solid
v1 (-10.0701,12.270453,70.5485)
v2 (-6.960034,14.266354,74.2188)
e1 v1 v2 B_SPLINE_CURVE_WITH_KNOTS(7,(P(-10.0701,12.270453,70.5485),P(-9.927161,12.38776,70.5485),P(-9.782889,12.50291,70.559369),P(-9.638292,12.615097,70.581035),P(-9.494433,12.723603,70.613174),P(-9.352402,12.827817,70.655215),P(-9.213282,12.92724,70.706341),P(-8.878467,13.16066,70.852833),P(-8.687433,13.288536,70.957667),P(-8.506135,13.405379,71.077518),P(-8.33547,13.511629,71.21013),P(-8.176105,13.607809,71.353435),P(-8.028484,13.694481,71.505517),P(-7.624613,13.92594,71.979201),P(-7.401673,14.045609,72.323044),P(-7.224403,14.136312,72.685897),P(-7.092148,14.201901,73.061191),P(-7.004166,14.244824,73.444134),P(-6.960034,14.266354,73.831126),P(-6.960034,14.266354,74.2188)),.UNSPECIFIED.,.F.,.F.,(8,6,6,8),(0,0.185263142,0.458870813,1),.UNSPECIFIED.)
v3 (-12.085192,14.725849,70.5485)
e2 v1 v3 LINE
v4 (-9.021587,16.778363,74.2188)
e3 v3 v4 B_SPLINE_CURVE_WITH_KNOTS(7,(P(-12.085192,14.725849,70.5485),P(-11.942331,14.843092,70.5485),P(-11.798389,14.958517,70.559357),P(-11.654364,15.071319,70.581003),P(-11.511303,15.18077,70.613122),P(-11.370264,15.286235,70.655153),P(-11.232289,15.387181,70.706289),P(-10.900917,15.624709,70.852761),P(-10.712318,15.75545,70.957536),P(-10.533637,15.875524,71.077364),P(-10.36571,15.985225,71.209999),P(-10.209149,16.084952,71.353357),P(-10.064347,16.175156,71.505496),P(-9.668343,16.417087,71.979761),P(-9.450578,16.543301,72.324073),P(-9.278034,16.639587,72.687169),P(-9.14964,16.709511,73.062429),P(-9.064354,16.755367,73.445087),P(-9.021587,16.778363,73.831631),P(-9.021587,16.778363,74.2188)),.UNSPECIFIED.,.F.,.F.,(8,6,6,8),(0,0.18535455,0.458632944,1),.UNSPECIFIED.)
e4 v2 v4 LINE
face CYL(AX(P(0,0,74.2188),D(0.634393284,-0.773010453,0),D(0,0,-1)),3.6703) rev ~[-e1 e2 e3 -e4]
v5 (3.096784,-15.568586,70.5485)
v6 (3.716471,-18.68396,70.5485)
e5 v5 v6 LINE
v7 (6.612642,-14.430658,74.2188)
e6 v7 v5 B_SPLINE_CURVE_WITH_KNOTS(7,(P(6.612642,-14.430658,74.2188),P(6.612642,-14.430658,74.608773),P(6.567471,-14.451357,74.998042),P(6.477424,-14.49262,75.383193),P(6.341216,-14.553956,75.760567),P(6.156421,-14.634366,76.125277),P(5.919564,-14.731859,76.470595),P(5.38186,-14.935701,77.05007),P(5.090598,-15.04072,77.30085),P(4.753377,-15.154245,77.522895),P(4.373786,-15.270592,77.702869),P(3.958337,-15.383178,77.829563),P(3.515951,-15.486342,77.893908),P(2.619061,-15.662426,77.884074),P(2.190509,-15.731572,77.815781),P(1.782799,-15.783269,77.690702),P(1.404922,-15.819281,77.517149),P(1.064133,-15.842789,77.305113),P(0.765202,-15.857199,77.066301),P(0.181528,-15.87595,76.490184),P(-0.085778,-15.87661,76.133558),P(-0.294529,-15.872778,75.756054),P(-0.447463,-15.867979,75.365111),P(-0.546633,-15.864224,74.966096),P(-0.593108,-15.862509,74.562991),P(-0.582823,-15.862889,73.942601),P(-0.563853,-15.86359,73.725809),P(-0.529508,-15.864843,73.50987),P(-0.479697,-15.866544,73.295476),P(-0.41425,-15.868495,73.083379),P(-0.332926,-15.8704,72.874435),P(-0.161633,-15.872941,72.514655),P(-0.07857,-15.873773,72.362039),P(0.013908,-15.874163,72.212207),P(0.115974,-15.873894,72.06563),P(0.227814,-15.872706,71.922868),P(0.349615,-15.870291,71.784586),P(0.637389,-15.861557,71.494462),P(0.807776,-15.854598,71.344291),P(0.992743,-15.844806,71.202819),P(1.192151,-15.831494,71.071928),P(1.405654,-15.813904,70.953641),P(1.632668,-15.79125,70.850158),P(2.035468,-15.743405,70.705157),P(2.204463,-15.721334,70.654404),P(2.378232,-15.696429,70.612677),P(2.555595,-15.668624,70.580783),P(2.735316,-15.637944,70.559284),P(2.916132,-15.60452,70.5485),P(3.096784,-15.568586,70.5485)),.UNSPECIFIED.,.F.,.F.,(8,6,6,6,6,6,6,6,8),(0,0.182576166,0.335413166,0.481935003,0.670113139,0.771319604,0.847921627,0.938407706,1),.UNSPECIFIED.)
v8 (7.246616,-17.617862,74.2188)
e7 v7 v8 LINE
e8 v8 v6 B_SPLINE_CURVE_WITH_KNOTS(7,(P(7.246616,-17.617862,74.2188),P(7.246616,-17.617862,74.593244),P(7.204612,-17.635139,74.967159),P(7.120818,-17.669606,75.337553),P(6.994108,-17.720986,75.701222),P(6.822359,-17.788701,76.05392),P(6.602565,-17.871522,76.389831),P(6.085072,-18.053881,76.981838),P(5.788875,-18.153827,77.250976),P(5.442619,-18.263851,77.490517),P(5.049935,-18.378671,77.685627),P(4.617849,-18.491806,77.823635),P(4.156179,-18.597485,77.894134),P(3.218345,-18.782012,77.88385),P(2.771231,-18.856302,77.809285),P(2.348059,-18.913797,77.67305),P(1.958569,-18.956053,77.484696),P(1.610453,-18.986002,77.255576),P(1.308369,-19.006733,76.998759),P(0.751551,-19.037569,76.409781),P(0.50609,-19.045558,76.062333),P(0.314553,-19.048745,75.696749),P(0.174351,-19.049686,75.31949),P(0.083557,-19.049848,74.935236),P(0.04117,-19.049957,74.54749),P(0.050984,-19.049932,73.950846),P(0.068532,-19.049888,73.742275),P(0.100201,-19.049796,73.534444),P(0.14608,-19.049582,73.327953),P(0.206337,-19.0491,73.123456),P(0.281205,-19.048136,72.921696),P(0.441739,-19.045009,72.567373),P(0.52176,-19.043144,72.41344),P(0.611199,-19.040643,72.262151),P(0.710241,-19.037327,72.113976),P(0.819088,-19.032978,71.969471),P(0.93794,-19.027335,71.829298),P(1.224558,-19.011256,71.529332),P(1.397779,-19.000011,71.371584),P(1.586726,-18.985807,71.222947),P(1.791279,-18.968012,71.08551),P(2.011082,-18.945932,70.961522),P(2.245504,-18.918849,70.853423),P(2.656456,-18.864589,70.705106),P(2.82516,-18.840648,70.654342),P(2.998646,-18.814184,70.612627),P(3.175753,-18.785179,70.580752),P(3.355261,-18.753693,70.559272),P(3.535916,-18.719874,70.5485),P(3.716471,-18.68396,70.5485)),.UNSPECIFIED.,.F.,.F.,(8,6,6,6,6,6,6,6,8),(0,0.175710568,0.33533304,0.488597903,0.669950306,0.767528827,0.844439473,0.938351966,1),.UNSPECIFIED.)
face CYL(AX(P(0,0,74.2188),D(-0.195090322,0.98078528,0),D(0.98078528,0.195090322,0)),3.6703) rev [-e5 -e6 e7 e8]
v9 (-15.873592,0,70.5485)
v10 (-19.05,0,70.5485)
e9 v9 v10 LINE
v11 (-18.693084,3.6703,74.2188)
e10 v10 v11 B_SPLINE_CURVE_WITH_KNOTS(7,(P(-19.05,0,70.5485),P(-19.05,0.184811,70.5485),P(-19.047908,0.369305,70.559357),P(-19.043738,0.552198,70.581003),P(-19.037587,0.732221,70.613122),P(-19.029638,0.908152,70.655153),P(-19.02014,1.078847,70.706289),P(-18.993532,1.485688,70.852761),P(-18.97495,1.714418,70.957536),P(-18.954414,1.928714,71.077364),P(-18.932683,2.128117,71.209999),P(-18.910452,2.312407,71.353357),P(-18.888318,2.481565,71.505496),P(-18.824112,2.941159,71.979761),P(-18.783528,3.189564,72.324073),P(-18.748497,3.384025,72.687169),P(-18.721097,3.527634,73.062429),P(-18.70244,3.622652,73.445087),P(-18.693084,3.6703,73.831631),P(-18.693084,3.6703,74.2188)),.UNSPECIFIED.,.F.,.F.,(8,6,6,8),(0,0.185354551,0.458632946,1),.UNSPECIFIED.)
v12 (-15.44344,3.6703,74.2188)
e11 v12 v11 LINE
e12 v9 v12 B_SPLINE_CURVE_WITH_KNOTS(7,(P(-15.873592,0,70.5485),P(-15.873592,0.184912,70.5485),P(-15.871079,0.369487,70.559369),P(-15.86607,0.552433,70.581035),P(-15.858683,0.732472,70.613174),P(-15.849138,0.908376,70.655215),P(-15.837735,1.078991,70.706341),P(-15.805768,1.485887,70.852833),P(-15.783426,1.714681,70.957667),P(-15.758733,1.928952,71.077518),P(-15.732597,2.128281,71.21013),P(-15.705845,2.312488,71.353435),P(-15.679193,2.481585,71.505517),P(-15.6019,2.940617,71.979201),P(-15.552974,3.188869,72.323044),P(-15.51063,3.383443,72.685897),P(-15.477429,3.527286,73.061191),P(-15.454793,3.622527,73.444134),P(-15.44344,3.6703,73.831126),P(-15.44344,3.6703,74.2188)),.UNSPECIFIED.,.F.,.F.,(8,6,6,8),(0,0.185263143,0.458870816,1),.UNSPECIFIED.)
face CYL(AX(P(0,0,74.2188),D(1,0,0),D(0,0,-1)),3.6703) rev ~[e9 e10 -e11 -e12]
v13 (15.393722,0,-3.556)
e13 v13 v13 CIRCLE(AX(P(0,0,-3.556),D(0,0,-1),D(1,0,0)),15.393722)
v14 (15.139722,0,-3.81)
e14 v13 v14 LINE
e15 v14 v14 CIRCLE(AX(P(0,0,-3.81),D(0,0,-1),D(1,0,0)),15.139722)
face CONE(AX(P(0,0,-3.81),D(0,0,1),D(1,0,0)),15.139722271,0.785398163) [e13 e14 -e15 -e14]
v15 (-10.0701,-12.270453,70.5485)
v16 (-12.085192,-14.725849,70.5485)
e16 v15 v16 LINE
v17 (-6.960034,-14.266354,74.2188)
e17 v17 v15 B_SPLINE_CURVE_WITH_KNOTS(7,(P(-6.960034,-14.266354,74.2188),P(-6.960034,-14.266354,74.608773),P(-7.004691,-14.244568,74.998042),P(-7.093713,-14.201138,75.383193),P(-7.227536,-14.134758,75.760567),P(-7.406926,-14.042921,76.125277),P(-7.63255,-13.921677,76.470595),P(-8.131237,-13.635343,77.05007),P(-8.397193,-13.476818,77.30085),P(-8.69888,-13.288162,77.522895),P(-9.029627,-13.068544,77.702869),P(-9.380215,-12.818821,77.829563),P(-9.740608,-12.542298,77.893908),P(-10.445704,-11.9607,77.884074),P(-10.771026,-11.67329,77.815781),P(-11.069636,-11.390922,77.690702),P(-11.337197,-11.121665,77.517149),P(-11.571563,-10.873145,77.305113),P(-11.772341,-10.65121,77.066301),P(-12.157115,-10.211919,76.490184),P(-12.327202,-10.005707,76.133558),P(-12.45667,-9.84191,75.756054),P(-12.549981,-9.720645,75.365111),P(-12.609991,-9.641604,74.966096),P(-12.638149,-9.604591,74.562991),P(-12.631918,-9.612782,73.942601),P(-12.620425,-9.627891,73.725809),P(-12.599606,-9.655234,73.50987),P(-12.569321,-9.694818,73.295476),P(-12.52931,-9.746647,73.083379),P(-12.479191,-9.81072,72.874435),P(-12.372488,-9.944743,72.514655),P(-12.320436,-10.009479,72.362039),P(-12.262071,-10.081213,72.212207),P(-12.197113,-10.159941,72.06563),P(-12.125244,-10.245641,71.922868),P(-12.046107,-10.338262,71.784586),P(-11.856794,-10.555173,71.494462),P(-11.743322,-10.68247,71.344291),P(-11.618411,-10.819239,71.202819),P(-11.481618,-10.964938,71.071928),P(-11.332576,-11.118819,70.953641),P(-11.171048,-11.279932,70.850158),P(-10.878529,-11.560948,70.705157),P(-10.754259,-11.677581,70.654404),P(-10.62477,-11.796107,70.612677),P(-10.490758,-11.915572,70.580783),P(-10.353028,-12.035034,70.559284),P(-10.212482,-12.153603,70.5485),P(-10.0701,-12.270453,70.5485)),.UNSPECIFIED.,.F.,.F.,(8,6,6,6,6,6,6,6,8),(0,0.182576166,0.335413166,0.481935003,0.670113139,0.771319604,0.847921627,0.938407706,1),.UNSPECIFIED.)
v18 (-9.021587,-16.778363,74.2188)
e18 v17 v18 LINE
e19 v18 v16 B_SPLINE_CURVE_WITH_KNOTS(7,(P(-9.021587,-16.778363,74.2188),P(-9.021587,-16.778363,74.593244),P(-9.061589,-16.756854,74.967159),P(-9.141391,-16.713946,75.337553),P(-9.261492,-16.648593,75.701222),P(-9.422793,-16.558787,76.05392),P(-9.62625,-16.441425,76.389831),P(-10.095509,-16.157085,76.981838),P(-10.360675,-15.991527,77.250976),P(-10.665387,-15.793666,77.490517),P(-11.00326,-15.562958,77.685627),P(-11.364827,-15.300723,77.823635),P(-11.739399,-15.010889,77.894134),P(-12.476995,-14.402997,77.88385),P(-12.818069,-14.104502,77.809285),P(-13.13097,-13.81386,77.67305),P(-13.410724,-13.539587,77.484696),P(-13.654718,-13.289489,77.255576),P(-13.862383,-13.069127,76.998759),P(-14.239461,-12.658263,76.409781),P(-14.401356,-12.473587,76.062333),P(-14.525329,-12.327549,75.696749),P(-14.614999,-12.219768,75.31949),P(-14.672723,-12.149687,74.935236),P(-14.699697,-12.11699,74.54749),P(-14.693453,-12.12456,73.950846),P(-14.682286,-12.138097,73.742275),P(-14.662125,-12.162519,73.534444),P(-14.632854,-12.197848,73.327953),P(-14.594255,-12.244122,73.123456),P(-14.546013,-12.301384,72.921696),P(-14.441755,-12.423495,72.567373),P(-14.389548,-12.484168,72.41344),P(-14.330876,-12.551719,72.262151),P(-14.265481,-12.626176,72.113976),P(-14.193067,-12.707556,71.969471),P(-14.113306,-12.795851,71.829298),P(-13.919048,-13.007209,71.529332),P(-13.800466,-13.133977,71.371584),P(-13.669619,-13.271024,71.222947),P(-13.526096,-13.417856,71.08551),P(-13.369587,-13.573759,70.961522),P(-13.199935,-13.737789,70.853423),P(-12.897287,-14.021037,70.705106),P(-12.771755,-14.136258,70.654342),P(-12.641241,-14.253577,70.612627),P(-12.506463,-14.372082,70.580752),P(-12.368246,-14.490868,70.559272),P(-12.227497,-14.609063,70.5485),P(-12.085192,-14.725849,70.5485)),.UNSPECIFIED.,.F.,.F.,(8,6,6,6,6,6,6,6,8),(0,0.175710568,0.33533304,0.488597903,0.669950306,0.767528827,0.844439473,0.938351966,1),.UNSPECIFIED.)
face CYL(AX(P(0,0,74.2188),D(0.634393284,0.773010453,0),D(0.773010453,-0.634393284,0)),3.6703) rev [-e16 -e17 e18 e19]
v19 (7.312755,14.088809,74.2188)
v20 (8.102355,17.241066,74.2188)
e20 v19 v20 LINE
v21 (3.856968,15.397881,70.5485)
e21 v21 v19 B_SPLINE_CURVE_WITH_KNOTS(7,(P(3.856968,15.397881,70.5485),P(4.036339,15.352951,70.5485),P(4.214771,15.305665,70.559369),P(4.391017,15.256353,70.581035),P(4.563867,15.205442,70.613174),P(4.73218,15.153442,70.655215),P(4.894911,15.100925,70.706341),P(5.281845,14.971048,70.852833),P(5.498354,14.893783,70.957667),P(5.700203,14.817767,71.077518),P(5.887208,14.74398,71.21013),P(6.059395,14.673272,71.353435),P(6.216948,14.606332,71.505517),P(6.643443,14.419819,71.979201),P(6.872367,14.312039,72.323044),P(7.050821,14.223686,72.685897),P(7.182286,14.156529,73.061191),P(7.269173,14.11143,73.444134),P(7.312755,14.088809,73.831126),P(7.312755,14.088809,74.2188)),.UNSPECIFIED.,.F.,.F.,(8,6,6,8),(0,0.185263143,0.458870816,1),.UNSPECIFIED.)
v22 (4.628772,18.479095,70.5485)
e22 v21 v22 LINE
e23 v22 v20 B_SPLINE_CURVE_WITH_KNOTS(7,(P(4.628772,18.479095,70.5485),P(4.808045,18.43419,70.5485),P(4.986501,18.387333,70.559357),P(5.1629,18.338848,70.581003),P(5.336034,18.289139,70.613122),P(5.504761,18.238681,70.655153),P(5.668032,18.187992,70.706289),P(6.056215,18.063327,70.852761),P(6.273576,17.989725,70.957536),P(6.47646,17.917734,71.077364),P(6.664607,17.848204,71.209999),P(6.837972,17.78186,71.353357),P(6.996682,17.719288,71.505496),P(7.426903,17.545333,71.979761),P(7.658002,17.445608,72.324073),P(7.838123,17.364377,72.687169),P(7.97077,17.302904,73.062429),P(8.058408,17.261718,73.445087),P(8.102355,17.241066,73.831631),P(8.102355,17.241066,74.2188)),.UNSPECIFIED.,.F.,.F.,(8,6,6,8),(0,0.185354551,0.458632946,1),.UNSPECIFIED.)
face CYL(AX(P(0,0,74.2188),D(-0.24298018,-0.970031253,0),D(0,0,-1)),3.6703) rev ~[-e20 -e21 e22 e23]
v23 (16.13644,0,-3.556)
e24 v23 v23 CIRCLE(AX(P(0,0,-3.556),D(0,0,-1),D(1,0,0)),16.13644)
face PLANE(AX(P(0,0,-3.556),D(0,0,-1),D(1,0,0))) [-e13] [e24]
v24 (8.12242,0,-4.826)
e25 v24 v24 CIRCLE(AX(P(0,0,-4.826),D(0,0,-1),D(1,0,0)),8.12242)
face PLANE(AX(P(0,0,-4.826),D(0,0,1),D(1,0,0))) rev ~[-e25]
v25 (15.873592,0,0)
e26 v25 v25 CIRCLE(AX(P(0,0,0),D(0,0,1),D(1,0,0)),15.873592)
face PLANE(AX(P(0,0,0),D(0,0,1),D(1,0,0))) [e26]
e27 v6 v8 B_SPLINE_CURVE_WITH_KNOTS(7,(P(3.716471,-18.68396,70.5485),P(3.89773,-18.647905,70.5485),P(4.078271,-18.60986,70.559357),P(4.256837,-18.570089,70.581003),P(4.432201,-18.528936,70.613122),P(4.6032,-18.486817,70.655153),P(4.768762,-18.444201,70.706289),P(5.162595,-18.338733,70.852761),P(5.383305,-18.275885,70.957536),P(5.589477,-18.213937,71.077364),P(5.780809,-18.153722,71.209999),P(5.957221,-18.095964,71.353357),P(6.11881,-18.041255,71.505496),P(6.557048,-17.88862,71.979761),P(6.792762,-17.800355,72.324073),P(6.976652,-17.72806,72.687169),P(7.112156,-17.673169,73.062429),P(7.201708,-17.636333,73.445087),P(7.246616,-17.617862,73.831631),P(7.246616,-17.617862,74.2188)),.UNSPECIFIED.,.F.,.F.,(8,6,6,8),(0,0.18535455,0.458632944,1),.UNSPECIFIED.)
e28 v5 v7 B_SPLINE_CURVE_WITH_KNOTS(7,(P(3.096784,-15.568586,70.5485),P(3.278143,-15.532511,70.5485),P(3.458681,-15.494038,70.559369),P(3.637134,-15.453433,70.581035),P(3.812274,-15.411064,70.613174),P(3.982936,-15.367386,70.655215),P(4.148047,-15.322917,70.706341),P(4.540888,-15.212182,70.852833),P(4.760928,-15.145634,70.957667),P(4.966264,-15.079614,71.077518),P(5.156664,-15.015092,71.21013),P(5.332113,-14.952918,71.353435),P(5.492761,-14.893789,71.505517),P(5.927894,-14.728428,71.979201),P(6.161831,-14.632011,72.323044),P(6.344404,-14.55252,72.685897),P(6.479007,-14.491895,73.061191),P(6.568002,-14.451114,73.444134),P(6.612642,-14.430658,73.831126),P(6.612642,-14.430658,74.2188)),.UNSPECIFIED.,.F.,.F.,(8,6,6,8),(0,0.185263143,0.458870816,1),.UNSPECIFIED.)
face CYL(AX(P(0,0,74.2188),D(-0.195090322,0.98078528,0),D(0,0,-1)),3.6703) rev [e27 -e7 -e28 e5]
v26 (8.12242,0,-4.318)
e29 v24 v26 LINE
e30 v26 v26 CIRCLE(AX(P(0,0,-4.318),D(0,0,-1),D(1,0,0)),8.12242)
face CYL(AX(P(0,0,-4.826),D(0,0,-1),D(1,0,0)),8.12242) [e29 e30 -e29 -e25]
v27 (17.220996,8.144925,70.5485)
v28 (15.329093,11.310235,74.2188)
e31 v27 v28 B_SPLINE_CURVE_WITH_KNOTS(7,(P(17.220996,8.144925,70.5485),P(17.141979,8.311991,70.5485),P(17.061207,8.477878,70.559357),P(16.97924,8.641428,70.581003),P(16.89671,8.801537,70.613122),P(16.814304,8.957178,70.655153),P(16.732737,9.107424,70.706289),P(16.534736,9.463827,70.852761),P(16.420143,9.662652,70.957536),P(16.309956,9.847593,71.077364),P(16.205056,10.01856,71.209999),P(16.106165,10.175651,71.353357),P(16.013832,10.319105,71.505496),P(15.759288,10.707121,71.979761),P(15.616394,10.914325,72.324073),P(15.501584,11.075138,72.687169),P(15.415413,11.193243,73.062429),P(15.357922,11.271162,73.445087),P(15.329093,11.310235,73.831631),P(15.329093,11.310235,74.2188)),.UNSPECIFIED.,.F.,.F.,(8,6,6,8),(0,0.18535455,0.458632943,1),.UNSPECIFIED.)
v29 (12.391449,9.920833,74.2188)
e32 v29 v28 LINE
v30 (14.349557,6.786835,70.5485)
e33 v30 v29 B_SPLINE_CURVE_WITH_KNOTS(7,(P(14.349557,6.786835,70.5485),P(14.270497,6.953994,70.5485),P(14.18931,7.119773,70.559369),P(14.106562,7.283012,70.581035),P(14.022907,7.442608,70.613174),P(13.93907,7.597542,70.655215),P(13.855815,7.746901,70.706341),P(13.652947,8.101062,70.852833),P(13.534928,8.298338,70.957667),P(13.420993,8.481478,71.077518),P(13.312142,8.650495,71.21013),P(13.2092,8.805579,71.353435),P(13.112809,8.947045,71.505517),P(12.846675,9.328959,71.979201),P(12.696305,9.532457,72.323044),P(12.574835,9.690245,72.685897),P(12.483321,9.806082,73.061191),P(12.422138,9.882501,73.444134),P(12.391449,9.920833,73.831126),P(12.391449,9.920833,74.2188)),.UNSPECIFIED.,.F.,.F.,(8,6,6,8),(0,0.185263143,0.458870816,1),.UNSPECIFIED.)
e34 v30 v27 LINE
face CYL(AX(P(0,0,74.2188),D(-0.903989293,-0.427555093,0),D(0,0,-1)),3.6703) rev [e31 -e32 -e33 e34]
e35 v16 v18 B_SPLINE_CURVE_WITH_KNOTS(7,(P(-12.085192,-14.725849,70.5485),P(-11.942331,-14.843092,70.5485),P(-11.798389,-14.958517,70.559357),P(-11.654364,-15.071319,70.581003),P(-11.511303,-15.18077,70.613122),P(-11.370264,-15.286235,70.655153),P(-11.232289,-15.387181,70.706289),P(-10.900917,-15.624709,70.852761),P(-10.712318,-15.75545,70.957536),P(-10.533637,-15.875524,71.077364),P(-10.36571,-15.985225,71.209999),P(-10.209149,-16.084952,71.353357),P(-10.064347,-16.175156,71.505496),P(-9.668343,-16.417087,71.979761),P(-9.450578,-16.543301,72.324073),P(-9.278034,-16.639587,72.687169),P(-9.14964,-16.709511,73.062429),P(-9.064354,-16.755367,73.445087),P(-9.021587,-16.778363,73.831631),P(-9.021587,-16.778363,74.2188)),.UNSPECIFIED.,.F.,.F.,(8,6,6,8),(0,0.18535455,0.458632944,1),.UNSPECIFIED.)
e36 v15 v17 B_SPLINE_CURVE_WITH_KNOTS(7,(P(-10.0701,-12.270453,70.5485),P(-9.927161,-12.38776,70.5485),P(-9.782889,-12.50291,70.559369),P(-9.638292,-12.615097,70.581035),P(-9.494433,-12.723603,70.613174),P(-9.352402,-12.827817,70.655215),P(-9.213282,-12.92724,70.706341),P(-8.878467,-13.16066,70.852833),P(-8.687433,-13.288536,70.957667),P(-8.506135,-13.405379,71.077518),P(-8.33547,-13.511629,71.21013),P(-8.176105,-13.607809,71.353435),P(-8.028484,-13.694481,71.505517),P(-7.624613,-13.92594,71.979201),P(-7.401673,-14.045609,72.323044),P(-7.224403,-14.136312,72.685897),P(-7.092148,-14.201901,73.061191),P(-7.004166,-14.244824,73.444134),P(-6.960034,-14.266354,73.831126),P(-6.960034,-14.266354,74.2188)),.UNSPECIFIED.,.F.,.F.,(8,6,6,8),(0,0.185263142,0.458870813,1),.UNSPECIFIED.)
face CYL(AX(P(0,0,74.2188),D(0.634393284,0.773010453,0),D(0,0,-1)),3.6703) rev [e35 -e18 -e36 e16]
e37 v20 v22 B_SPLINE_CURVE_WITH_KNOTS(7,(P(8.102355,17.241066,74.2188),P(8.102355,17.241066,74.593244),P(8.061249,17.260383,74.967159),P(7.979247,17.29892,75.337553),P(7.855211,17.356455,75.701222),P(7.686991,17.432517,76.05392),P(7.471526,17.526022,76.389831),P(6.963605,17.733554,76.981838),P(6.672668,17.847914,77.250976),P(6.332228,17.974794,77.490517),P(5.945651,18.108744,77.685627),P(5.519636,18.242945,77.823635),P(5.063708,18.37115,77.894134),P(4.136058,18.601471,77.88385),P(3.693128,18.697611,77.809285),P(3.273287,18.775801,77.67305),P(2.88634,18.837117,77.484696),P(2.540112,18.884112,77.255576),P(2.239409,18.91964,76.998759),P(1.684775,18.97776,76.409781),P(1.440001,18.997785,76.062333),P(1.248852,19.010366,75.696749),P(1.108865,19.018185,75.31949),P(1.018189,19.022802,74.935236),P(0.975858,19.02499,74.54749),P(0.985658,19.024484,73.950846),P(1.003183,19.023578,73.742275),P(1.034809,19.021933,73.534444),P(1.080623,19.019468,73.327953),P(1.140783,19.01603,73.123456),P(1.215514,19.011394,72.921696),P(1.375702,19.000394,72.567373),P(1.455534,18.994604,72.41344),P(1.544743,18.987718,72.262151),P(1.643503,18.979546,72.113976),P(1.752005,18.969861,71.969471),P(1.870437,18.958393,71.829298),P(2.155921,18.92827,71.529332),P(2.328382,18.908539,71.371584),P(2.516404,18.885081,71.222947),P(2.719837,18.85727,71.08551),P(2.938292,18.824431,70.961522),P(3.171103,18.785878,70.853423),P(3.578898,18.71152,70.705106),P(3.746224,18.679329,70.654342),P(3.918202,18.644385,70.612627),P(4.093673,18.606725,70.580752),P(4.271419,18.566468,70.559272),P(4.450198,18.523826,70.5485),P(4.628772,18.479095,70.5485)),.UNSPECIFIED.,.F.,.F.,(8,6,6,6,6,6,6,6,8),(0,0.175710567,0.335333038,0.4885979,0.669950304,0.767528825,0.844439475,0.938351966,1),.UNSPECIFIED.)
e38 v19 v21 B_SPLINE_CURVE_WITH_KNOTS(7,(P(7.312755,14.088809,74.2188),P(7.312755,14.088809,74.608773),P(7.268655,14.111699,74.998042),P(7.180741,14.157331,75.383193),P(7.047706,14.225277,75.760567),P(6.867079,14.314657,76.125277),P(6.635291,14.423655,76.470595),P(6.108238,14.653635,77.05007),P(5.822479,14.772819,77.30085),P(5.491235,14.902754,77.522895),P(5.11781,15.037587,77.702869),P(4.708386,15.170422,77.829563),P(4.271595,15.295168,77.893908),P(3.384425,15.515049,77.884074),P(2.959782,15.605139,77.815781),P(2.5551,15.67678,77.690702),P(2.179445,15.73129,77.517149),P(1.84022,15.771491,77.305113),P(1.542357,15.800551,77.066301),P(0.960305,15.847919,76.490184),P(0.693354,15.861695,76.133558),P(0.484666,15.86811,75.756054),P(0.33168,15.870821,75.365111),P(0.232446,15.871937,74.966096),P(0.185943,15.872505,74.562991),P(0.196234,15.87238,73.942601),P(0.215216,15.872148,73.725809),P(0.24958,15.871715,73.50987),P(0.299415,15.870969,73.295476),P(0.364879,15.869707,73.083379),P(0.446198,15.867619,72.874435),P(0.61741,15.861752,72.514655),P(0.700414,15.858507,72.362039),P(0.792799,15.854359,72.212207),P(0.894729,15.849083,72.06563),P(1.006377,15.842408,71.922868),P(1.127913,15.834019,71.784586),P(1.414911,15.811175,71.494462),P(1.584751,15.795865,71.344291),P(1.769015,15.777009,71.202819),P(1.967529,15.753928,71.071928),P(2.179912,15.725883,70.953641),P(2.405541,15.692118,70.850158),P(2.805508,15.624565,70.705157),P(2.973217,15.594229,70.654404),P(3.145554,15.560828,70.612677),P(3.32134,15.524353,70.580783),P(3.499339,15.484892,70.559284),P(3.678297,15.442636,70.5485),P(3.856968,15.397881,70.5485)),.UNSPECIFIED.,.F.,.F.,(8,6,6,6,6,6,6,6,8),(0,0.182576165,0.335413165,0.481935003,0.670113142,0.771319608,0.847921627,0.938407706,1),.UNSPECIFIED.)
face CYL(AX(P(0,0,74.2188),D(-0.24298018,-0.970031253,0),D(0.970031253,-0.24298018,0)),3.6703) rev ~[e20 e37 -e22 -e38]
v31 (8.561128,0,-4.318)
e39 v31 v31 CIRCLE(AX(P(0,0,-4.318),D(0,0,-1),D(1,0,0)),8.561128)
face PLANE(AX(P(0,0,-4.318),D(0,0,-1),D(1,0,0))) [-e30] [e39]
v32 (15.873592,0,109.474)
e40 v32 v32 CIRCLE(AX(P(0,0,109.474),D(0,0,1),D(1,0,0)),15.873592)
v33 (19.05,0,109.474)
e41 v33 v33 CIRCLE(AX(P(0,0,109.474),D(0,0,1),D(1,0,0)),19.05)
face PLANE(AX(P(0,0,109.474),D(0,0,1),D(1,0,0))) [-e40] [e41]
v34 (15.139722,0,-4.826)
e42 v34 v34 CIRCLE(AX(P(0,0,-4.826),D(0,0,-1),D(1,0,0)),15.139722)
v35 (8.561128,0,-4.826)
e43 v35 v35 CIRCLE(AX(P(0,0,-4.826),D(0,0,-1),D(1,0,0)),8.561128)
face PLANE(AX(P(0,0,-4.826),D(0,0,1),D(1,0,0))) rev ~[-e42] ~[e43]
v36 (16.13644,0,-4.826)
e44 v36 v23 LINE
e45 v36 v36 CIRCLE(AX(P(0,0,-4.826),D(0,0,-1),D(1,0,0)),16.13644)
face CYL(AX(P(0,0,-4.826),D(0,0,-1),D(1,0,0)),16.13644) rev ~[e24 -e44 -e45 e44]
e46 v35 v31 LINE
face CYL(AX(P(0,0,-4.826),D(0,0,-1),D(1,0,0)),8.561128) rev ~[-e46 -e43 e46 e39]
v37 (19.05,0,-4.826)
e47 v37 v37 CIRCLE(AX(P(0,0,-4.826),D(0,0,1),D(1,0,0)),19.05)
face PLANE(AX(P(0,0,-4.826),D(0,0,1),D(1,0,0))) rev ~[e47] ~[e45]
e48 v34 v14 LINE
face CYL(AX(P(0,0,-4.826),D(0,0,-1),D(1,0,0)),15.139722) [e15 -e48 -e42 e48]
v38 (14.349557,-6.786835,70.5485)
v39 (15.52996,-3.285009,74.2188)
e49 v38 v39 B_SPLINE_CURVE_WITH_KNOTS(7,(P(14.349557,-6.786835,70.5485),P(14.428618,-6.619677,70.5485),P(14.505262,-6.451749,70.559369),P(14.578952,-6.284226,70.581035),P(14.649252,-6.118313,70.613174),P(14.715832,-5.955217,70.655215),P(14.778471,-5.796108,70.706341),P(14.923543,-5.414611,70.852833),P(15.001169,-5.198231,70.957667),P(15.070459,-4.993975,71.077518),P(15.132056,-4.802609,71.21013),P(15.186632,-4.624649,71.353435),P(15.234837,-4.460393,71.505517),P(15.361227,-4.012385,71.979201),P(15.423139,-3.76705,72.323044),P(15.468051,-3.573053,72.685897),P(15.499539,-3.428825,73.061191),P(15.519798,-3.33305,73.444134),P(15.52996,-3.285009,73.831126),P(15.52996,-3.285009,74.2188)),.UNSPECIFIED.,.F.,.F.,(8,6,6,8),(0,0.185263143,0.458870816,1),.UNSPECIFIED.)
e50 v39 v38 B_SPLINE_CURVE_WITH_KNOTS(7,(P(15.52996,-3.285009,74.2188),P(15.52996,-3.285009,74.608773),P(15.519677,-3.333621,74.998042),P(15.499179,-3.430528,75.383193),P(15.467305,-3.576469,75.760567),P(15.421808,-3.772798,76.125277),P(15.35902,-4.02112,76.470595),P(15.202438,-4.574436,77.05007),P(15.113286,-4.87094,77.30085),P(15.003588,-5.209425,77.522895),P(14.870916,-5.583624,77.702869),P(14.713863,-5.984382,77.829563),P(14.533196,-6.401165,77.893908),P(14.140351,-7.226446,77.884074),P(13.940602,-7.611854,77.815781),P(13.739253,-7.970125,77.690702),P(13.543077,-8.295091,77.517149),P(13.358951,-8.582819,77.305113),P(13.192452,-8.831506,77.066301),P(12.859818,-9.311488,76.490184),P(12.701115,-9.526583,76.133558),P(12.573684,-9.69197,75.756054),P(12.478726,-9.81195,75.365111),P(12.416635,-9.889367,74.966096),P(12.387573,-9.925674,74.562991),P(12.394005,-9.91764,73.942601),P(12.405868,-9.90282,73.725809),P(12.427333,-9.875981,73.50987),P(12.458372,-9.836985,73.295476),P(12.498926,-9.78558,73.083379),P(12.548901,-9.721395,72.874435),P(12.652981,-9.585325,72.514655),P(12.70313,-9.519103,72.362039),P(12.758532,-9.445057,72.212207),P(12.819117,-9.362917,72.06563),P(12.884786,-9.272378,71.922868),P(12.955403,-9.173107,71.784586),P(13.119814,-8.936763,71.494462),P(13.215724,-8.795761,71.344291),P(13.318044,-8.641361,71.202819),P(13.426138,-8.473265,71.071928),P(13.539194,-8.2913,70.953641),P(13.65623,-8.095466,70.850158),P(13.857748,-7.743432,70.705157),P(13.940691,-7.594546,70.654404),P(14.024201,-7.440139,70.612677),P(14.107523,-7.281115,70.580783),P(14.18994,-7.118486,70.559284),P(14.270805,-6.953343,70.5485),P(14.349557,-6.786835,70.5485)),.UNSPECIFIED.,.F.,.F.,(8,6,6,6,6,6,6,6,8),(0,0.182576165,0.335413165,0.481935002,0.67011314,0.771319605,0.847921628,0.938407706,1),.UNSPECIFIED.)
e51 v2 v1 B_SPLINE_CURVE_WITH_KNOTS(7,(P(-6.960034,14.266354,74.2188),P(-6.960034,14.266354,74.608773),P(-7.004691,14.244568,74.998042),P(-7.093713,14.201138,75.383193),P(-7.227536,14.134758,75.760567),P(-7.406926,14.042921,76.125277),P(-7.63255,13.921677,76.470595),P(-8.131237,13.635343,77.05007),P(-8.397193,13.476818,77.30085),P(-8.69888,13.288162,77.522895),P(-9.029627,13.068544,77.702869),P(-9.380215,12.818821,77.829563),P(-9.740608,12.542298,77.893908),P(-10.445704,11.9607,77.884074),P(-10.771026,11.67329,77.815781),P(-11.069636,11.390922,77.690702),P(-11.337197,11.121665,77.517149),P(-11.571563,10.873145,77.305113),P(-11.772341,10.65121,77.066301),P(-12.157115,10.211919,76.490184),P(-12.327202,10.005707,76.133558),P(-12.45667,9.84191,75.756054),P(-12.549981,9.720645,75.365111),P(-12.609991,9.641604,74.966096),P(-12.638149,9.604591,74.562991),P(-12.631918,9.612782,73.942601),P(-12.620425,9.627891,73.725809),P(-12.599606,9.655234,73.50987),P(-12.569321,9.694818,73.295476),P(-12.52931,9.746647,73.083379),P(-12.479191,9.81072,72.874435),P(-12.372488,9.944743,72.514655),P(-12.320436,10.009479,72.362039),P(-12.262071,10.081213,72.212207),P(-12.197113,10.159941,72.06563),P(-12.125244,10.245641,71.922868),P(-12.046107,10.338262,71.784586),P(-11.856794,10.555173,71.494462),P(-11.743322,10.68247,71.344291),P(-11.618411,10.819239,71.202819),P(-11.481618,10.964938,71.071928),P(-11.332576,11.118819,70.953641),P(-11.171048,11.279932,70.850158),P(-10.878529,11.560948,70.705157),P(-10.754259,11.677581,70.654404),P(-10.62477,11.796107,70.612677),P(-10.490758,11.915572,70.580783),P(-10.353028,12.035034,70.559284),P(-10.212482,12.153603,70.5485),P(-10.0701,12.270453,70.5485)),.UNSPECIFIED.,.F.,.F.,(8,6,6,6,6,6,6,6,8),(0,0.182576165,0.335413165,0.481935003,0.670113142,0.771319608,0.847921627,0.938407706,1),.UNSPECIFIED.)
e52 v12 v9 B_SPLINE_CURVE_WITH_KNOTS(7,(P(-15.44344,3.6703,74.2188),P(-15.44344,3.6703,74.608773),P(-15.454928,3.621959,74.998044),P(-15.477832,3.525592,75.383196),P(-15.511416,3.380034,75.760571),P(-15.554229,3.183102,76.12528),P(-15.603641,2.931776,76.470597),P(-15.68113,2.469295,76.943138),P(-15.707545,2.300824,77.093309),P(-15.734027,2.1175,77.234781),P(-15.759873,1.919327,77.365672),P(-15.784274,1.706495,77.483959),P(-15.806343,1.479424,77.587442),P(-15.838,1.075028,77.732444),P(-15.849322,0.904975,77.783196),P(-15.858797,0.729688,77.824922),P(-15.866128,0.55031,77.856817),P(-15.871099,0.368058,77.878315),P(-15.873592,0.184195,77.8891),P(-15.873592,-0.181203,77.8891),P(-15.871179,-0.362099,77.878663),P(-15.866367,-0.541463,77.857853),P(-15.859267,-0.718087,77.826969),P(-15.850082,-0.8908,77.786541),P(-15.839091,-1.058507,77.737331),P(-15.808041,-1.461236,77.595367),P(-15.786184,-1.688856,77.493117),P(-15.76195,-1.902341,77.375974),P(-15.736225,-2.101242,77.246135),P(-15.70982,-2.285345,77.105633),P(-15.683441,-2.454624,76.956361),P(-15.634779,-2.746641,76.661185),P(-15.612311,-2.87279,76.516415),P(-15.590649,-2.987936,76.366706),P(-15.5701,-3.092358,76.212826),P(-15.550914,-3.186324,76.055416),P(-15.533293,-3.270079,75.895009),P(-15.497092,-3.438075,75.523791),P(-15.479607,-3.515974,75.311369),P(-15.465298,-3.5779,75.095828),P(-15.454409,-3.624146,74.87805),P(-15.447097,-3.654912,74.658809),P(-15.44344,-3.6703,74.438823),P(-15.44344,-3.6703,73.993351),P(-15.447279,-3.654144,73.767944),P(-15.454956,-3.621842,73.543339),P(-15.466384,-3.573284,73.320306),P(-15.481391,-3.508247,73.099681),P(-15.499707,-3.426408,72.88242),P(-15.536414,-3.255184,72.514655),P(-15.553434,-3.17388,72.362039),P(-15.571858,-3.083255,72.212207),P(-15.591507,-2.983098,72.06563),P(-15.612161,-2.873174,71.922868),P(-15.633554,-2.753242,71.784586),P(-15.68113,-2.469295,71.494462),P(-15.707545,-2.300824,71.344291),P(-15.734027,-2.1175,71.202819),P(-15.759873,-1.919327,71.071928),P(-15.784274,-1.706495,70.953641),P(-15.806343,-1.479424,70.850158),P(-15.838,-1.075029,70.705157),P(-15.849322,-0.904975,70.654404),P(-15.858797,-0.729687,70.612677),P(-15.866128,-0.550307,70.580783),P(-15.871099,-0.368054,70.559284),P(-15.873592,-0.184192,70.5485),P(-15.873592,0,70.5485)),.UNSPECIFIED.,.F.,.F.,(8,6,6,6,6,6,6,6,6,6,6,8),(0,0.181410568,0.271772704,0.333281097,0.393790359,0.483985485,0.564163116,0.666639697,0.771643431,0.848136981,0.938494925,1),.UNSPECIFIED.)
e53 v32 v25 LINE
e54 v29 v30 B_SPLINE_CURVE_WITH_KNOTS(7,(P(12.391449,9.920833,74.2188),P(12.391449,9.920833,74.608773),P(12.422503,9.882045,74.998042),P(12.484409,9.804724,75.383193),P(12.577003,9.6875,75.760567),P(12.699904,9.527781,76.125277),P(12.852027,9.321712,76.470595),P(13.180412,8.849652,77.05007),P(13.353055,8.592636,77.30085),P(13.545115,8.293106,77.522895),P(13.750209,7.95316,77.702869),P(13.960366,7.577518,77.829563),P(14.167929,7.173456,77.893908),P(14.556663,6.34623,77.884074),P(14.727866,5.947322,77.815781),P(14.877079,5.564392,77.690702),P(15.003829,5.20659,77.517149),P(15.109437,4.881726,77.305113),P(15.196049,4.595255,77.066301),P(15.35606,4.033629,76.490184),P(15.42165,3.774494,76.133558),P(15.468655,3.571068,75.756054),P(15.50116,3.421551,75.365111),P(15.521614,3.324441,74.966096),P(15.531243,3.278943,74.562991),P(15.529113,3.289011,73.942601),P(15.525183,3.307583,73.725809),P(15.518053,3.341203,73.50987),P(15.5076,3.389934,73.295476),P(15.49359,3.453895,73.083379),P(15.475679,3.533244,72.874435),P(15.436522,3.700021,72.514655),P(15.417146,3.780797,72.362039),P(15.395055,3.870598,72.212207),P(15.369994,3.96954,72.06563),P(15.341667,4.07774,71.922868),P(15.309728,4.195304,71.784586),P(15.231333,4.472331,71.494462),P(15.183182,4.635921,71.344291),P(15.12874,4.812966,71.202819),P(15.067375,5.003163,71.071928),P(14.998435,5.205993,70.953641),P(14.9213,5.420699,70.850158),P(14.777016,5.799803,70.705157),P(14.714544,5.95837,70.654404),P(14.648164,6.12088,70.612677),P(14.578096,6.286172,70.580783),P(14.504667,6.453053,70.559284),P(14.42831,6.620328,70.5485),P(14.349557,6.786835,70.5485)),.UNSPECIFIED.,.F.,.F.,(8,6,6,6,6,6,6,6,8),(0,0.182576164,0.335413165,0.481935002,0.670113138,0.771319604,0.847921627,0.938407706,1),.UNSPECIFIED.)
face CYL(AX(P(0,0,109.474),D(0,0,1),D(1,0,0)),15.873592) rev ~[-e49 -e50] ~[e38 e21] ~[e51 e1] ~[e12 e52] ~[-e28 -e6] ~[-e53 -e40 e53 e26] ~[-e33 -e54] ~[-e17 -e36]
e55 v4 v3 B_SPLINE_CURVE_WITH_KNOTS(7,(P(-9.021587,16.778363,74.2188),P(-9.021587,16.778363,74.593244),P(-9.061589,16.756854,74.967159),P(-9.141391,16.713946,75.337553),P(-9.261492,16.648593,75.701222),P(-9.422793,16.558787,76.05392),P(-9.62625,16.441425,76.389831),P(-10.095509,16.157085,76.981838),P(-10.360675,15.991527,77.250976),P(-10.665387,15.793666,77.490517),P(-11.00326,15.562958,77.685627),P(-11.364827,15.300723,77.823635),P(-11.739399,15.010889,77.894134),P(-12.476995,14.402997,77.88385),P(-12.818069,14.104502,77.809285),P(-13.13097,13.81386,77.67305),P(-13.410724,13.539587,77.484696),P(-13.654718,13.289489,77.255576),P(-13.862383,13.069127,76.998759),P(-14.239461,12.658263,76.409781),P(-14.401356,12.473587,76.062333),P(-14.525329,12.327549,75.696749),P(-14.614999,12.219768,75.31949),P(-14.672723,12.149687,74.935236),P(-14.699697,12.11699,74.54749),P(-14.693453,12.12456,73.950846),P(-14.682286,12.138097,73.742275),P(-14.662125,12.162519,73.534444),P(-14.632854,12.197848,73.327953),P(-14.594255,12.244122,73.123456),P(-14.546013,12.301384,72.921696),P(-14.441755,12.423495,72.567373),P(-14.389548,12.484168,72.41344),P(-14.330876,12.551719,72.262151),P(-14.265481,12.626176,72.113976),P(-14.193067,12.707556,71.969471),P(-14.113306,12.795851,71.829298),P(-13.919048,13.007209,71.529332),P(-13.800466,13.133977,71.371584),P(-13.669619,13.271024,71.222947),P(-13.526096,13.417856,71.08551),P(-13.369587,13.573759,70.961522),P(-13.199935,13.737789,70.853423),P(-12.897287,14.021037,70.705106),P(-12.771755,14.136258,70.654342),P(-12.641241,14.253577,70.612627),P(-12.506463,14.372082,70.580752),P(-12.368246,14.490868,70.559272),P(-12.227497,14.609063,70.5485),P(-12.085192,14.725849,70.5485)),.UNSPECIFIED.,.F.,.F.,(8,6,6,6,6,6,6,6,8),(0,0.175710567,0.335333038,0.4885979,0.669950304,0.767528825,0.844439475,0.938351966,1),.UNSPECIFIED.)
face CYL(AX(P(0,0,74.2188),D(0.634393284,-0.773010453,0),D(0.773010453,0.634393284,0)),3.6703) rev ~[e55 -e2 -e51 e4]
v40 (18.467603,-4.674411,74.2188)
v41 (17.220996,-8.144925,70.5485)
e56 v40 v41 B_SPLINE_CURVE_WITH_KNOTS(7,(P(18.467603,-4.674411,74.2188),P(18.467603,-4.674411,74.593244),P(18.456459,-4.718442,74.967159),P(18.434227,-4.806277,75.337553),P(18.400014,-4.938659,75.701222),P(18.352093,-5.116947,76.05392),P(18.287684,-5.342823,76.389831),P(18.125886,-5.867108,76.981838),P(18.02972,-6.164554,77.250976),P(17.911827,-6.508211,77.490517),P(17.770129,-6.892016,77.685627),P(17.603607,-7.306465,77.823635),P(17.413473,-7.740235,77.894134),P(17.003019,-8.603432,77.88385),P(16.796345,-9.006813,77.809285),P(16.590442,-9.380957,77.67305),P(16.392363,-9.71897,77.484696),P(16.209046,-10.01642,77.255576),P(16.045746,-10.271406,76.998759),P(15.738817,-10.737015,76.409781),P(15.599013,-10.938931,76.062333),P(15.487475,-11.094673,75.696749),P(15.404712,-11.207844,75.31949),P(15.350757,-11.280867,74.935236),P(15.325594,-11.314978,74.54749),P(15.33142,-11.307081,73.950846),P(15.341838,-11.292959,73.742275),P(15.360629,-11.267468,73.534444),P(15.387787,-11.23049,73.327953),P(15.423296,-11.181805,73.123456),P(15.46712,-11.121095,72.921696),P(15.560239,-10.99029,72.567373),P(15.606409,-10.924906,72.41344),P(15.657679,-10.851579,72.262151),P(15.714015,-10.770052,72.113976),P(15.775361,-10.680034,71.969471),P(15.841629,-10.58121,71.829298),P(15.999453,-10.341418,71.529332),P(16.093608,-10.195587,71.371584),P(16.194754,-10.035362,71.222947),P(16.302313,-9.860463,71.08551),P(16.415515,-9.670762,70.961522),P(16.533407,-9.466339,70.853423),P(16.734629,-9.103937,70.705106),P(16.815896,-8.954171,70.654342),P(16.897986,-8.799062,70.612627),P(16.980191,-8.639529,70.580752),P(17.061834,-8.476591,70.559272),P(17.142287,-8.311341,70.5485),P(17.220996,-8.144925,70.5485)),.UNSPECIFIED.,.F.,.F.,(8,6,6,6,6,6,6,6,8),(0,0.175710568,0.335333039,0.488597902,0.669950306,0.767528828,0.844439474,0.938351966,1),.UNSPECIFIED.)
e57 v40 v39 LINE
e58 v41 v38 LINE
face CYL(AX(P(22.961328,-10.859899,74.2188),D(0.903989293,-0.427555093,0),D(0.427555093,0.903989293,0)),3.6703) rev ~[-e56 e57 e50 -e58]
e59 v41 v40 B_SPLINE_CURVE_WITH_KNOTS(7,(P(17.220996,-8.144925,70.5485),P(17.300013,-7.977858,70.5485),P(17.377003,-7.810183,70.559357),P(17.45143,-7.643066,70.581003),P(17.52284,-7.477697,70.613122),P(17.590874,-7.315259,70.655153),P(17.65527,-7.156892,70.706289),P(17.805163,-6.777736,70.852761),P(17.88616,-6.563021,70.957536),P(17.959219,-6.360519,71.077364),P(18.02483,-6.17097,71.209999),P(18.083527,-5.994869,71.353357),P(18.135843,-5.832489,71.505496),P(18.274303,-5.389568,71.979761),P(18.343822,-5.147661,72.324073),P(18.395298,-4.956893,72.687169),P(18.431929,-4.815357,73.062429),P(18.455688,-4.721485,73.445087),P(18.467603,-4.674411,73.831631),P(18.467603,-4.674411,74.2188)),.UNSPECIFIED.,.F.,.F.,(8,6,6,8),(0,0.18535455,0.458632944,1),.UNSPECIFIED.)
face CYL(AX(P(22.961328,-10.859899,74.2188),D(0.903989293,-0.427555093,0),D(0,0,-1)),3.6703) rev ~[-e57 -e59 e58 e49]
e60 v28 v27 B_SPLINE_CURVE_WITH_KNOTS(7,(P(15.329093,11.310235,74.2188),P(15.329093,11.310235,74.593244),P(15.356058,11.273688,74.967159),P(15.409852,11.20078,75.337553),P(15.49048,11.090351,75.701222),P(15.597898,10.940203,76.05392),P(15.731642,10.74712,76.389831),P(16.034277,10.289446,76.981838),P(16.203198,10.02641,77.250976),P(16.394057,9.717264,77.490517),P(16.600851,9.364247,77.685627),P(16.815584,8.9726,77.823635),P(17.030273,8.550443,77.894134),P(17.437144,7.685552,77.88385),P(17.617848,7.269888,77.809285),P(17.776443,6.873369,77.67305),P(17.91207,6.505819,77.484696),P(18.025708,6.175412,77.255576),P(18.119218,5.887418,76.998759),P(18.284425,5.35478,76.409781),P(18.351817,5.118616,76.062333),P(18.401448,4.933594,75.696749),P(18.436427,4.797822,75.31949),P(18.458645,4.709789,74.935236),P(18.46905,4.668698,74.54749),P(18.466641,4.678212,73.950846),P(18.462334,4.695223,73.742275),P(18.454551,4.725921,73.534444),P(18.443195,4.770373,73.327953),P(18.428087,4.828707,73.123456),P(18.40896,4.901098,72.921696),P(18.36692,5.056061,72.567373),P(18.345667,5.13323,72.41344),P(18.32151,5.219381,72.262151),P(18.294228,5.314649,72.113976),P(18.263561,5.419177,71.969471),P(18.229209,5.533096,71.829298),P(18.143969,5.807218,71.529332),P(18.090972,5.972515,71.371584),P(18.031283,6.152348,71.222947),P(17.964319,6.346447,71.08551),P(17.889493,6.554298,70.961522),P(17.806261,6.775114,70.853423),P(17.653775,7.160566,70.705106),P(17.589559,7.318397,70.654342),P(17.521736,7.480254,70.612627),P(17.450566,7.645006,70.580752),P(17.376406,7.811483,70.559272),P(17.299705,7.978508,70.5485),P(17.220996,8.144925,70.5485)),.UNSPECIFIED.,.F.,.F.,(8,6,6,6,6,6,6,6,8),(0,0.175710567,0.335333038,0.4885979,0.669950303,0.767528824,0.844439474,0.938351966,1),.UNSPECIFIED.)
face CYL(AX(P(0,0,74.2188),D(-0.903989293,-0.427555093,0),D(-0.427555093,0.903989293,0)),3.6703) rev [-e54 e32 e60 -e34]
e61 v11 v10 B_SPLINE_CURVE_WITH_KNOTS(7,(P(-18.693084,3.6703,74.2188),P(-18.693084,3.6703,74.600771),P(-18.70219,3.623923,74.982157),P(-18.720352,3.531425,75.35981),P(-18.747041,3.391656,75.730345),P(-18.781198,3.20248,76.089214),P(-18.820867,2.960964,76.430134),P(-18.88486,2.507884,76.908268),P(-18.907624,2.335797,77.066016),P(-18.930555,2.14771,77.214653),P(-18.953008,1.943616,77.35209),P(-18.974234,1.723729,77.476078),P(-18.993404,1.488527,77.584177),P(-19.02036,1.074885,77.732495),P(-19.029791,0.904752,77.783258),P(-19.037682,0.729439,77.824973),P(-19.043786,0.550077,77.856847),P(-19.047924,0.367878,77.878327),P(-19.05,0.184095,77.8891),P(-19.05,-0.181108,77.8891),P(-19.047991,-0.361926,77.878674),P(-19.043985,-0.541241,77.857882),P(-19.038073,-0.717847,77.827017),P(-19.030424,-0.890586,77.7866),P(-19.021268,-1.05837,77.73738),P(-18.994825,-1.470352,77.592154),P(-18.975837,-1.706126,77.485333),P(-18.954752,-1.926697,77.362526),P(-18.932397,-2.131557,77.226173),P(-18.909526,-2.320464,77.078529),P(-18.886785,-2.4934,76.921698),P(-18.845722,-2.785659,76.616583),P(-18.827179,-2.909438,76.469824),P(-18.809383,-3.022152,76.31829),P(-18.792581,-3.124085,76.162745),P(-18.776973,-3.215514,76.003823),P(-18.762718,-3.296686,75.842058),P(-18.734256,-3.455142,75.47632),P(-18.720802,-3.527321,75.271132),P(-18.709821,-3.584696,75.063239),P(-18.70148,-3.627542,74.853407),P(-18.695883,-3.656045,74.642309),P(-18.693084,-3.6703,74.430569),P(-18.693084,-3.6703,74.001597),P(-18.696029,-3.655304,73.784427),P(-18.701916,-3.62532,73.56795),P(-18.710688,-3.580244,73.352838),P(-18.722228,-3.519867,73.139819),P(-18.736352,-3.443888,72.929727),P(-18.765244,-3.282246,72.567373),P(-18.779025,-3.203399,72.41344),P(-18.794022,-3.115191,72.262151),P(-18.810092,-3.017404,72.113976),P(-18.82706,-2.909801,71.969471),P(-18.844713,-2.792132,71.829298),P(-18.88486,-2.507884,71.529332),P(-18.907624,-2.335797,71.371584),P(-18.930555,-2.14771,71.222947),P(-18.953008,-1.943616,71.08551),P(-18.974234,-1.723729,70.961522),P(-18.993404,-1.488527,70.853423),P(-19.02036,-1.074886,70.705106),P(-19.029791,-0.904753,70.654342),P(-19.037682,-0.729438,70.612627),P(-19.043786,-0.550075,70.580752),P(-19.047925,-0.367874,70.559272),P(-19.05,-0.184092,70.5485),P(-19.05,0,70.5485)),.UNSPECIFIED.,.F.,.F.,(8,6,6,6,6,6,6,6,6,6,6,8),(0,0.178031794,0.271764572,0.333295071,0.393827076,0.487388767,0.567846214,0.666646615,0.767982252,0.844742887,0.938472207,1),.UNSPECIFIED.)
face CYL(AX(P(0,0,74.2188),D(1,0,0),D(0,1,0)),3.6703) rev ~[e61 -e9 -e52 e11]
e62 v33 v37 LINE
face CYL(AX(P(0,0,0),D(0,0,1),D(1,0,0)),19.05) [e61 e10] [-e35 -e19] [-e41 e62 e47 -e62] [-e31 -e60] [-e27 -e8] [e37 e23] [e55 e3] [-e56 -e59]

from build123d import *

# Parameters (mm, degrees)
F0_R      = 19.05
F1_DEPTH  = 109.474
F2_R      = 15.873592274
F3_DEPTH  = 109.728
F4_R      = 19.05
F5_DEPTH  = 1.27
F25_DEPTH = 25.4
F26_DEPTH = 32.004
F28_DEPTH = 45.466
F30_DEPTH = 34.036
F32_DEPTH = 25.4
F34_DEPTH = 25.4
F36_DEPTH = 53.086
F38_DEPTH = 65.786
F39_R     = 19.05
F40_DEPTH = 4.826
F41_R     = 16.1364398947
F41_R_2   = 15.139722271
F42_DEPTH = 1.27
F43_SIZE  = 0.254
F44_R     = 8.561127958
F44_R_2   = 8.1224197416
F45_DEPTH = 0.508


with BuildPart() as f1:
    # F0 (on Top) → F1 (new body)
    with BuildSketch(Plane.XY):
        Circle(F0_R)
    extrude(amount=F1_DEPTH)

    # F2 (on face) → F3 (cut)
    with BuildSketch(Plane.XY.offset(109.474)):
        Circle(F2_R)
    extrude(amount=-F3_DEPTH, mode=Mode.SUBTRACT)

    # F4 (on Top) → F5 (join)
    with BuildSketch(Plane.XY):
        Circle(F4_R)
    extrude(amount=-F5_DEPTH)

    # F24 (on face) → F25 (join)
    with BuildSketch(Plane(origin=(0, 0, 0), x_dir=(0.4275550934, 0.9039892931, 0), z_dir=(0.9039892931, -0.4275550934, 0))):
        with BuildLine():
            ThreePointArc((0, 70.5485), (2.595294019, 71.623505981), (3.6703, 74.2188))
            ThreePointArc((3.6703, 74.2188), (-2.595294019, 76.814094019), (0, 70.5485))
        make_face()
    extrude(amount=F25_DEPTH)

    # F26 (cut): a face of the model
    f26_faces = [f1.faces().sort_by_distance(p)[0] for p in [
        (22.9613280453, -10.8598993731, 74.2188),
    ]]
    extrude(f26_faces, amount=-F26_DEPTH, mode=Mode.SUBTRACT)

    # F27 (on face) → F28 (cut)
    with BuildSketch(Plane(origin=(0, 0, 0), x_dir=(-0.4275550934, 0.9039892931, 0), z_dir=(0.9039892931, 0.4275550934, 0))):
        with BuildLine():
            ThreePointArc((0, 70.5485), (2.595294019, 71.623505981), (3.6703, 74.2188))
            ThreePointArc((3.6703, 74.2188), (-2.595294019, 76.814094019), (0, 70.5485))
        make_face()
    extrude(amount=F28_DEPTH, mode=Mode.SUBTRACT)

    # F29 (on face) → F30 (cut)
    with BuildSketch(Plane(origin=(0, 0, 0), x_dir=(0.9700312532, -0.2429801799, 0), z_dir=(-0.2429801799, -0.9700312532, 0))):
        with BuildLine():
            ThreePointArc((0, 70.5485), (2.595294019, 71.623505981), (3.6703, 74.2188))
            ThreePointArc((3.6703, 74.2188), (-2.595294019, 76.814094019), (0, 70.5485))
        make_face()
    extrude(amount=-F30_DEPTH, mode=Mode.SUBTRACT)

    # F31 (on face) → F32 (cut)
    with BuildSketch(Plane(origin=(0, 0, 0), x_dir=(0.7730104534, 0.6343932842, 0), z_dir=(0.6343932842, -0.7730104534, 0))):
        with BuildLine():
            ThreePointArc((0, 70.5485), (2.595294019, 71.623505981), (3.6703, 74.2188))
            ThreePointArc((3.6703, 74.2188), (-2.595294019, 76.814094019), (0, 70.5485))
        make_face()
    extrude(amount=-F32_DEPTH, mode=Mode.SUBTRACT)

    # F33 (on Right) → F34 (cut)
    with BuildSketch(Plane.YZ):
        with BuildLine():
            ThreePointArc((0, 70.5485), (2.595294019, 71.623505981), (3.6703, 74.2188))
            ThreePointArc((3.6703, 74.2188), (-2.595294019, 76.814094019), (0, 70.5485))
        make_face()
    extrude(amount=-F34_DEPTH, mode=Mode.SUBTRACT)

    # F35 (on face) → F36 (cut)
    with BuildSketch(Plane(origin=(0, 0, 0), x_dir=(0.7730104534, -0.6343932842, 0), z_dir=(-0.6343932842, -0.7730104534, 0))):
        with BuildLine():
            ThreePointArc((0, 70.5485), (2.595294019, 71.623505981), (3.6703, 74.2188))
            ThreePointArc((3.6703, 74.2188), (-2.595294019, 76.814094019), (0, 70.5485))
        make_face()
    extrude(amount=F36_DEPTH, mode=Mode.SUBTRACT)

    # F37 (on face) → F38 (cut)
    with BuildSketch(Plane(origin=(0, 0, 0), x_dir=(0.9807852804, 0.195090322, 0), z_dir=(0.195090322, -0.9807852804, 0))):
        with BuildLine():
            ThreePointArc((0, 70.5485), (2.595294019, 71.623505981), (3.6703, 74.2188))
            ThreePointArc((3.6703, 74.2188), (-2.595294019, 76.814094019), (0, 70.5485))
        make_face()
    extrude(amount=F38_DEPTH, mode=Mode.SUBTRACT)

    # F39 (on Top) → F40 (join)
    with BuildSketch(Plane.XY):
        Circle(F39_R)
    extrude(amount=-F40_DEPTH)

    # F41 (on face) → F42 (cut)
    with BuildSketch(Plane(origin=(0, 0, -4.826), x_dir=(1, 0, 0), z_dir=(0, 0, -1))):
        Circle(F41_R)
        Circle(F41_R_2, mode=Mode.SUBTRACT)
    extrude(amount=-F42_DEPTH, mode=Mode.SUBTRACT)

    # F43
    f43_edges = [f1.edges().sort_by_distance(p)[0] for p in [
        (-15.139722, 0, -3.556),
    ]]
    chamfer(f43_edges, length=F43_SIZE)

    # F44 (on face) → F45 (cut)
    with BuildSketch(Plane(origin=(0, 0, -4.826), x_dir=(1, 0, 0), z_dir=(0, 0, -1))):
        Circle(F44_R)
        Circle(F44_R_2, mode=Mode.SUBTRACT)
    extrude(amount=-F45_DEPTH, mode=Mode.SUBTRACT)


solid = f1.part
